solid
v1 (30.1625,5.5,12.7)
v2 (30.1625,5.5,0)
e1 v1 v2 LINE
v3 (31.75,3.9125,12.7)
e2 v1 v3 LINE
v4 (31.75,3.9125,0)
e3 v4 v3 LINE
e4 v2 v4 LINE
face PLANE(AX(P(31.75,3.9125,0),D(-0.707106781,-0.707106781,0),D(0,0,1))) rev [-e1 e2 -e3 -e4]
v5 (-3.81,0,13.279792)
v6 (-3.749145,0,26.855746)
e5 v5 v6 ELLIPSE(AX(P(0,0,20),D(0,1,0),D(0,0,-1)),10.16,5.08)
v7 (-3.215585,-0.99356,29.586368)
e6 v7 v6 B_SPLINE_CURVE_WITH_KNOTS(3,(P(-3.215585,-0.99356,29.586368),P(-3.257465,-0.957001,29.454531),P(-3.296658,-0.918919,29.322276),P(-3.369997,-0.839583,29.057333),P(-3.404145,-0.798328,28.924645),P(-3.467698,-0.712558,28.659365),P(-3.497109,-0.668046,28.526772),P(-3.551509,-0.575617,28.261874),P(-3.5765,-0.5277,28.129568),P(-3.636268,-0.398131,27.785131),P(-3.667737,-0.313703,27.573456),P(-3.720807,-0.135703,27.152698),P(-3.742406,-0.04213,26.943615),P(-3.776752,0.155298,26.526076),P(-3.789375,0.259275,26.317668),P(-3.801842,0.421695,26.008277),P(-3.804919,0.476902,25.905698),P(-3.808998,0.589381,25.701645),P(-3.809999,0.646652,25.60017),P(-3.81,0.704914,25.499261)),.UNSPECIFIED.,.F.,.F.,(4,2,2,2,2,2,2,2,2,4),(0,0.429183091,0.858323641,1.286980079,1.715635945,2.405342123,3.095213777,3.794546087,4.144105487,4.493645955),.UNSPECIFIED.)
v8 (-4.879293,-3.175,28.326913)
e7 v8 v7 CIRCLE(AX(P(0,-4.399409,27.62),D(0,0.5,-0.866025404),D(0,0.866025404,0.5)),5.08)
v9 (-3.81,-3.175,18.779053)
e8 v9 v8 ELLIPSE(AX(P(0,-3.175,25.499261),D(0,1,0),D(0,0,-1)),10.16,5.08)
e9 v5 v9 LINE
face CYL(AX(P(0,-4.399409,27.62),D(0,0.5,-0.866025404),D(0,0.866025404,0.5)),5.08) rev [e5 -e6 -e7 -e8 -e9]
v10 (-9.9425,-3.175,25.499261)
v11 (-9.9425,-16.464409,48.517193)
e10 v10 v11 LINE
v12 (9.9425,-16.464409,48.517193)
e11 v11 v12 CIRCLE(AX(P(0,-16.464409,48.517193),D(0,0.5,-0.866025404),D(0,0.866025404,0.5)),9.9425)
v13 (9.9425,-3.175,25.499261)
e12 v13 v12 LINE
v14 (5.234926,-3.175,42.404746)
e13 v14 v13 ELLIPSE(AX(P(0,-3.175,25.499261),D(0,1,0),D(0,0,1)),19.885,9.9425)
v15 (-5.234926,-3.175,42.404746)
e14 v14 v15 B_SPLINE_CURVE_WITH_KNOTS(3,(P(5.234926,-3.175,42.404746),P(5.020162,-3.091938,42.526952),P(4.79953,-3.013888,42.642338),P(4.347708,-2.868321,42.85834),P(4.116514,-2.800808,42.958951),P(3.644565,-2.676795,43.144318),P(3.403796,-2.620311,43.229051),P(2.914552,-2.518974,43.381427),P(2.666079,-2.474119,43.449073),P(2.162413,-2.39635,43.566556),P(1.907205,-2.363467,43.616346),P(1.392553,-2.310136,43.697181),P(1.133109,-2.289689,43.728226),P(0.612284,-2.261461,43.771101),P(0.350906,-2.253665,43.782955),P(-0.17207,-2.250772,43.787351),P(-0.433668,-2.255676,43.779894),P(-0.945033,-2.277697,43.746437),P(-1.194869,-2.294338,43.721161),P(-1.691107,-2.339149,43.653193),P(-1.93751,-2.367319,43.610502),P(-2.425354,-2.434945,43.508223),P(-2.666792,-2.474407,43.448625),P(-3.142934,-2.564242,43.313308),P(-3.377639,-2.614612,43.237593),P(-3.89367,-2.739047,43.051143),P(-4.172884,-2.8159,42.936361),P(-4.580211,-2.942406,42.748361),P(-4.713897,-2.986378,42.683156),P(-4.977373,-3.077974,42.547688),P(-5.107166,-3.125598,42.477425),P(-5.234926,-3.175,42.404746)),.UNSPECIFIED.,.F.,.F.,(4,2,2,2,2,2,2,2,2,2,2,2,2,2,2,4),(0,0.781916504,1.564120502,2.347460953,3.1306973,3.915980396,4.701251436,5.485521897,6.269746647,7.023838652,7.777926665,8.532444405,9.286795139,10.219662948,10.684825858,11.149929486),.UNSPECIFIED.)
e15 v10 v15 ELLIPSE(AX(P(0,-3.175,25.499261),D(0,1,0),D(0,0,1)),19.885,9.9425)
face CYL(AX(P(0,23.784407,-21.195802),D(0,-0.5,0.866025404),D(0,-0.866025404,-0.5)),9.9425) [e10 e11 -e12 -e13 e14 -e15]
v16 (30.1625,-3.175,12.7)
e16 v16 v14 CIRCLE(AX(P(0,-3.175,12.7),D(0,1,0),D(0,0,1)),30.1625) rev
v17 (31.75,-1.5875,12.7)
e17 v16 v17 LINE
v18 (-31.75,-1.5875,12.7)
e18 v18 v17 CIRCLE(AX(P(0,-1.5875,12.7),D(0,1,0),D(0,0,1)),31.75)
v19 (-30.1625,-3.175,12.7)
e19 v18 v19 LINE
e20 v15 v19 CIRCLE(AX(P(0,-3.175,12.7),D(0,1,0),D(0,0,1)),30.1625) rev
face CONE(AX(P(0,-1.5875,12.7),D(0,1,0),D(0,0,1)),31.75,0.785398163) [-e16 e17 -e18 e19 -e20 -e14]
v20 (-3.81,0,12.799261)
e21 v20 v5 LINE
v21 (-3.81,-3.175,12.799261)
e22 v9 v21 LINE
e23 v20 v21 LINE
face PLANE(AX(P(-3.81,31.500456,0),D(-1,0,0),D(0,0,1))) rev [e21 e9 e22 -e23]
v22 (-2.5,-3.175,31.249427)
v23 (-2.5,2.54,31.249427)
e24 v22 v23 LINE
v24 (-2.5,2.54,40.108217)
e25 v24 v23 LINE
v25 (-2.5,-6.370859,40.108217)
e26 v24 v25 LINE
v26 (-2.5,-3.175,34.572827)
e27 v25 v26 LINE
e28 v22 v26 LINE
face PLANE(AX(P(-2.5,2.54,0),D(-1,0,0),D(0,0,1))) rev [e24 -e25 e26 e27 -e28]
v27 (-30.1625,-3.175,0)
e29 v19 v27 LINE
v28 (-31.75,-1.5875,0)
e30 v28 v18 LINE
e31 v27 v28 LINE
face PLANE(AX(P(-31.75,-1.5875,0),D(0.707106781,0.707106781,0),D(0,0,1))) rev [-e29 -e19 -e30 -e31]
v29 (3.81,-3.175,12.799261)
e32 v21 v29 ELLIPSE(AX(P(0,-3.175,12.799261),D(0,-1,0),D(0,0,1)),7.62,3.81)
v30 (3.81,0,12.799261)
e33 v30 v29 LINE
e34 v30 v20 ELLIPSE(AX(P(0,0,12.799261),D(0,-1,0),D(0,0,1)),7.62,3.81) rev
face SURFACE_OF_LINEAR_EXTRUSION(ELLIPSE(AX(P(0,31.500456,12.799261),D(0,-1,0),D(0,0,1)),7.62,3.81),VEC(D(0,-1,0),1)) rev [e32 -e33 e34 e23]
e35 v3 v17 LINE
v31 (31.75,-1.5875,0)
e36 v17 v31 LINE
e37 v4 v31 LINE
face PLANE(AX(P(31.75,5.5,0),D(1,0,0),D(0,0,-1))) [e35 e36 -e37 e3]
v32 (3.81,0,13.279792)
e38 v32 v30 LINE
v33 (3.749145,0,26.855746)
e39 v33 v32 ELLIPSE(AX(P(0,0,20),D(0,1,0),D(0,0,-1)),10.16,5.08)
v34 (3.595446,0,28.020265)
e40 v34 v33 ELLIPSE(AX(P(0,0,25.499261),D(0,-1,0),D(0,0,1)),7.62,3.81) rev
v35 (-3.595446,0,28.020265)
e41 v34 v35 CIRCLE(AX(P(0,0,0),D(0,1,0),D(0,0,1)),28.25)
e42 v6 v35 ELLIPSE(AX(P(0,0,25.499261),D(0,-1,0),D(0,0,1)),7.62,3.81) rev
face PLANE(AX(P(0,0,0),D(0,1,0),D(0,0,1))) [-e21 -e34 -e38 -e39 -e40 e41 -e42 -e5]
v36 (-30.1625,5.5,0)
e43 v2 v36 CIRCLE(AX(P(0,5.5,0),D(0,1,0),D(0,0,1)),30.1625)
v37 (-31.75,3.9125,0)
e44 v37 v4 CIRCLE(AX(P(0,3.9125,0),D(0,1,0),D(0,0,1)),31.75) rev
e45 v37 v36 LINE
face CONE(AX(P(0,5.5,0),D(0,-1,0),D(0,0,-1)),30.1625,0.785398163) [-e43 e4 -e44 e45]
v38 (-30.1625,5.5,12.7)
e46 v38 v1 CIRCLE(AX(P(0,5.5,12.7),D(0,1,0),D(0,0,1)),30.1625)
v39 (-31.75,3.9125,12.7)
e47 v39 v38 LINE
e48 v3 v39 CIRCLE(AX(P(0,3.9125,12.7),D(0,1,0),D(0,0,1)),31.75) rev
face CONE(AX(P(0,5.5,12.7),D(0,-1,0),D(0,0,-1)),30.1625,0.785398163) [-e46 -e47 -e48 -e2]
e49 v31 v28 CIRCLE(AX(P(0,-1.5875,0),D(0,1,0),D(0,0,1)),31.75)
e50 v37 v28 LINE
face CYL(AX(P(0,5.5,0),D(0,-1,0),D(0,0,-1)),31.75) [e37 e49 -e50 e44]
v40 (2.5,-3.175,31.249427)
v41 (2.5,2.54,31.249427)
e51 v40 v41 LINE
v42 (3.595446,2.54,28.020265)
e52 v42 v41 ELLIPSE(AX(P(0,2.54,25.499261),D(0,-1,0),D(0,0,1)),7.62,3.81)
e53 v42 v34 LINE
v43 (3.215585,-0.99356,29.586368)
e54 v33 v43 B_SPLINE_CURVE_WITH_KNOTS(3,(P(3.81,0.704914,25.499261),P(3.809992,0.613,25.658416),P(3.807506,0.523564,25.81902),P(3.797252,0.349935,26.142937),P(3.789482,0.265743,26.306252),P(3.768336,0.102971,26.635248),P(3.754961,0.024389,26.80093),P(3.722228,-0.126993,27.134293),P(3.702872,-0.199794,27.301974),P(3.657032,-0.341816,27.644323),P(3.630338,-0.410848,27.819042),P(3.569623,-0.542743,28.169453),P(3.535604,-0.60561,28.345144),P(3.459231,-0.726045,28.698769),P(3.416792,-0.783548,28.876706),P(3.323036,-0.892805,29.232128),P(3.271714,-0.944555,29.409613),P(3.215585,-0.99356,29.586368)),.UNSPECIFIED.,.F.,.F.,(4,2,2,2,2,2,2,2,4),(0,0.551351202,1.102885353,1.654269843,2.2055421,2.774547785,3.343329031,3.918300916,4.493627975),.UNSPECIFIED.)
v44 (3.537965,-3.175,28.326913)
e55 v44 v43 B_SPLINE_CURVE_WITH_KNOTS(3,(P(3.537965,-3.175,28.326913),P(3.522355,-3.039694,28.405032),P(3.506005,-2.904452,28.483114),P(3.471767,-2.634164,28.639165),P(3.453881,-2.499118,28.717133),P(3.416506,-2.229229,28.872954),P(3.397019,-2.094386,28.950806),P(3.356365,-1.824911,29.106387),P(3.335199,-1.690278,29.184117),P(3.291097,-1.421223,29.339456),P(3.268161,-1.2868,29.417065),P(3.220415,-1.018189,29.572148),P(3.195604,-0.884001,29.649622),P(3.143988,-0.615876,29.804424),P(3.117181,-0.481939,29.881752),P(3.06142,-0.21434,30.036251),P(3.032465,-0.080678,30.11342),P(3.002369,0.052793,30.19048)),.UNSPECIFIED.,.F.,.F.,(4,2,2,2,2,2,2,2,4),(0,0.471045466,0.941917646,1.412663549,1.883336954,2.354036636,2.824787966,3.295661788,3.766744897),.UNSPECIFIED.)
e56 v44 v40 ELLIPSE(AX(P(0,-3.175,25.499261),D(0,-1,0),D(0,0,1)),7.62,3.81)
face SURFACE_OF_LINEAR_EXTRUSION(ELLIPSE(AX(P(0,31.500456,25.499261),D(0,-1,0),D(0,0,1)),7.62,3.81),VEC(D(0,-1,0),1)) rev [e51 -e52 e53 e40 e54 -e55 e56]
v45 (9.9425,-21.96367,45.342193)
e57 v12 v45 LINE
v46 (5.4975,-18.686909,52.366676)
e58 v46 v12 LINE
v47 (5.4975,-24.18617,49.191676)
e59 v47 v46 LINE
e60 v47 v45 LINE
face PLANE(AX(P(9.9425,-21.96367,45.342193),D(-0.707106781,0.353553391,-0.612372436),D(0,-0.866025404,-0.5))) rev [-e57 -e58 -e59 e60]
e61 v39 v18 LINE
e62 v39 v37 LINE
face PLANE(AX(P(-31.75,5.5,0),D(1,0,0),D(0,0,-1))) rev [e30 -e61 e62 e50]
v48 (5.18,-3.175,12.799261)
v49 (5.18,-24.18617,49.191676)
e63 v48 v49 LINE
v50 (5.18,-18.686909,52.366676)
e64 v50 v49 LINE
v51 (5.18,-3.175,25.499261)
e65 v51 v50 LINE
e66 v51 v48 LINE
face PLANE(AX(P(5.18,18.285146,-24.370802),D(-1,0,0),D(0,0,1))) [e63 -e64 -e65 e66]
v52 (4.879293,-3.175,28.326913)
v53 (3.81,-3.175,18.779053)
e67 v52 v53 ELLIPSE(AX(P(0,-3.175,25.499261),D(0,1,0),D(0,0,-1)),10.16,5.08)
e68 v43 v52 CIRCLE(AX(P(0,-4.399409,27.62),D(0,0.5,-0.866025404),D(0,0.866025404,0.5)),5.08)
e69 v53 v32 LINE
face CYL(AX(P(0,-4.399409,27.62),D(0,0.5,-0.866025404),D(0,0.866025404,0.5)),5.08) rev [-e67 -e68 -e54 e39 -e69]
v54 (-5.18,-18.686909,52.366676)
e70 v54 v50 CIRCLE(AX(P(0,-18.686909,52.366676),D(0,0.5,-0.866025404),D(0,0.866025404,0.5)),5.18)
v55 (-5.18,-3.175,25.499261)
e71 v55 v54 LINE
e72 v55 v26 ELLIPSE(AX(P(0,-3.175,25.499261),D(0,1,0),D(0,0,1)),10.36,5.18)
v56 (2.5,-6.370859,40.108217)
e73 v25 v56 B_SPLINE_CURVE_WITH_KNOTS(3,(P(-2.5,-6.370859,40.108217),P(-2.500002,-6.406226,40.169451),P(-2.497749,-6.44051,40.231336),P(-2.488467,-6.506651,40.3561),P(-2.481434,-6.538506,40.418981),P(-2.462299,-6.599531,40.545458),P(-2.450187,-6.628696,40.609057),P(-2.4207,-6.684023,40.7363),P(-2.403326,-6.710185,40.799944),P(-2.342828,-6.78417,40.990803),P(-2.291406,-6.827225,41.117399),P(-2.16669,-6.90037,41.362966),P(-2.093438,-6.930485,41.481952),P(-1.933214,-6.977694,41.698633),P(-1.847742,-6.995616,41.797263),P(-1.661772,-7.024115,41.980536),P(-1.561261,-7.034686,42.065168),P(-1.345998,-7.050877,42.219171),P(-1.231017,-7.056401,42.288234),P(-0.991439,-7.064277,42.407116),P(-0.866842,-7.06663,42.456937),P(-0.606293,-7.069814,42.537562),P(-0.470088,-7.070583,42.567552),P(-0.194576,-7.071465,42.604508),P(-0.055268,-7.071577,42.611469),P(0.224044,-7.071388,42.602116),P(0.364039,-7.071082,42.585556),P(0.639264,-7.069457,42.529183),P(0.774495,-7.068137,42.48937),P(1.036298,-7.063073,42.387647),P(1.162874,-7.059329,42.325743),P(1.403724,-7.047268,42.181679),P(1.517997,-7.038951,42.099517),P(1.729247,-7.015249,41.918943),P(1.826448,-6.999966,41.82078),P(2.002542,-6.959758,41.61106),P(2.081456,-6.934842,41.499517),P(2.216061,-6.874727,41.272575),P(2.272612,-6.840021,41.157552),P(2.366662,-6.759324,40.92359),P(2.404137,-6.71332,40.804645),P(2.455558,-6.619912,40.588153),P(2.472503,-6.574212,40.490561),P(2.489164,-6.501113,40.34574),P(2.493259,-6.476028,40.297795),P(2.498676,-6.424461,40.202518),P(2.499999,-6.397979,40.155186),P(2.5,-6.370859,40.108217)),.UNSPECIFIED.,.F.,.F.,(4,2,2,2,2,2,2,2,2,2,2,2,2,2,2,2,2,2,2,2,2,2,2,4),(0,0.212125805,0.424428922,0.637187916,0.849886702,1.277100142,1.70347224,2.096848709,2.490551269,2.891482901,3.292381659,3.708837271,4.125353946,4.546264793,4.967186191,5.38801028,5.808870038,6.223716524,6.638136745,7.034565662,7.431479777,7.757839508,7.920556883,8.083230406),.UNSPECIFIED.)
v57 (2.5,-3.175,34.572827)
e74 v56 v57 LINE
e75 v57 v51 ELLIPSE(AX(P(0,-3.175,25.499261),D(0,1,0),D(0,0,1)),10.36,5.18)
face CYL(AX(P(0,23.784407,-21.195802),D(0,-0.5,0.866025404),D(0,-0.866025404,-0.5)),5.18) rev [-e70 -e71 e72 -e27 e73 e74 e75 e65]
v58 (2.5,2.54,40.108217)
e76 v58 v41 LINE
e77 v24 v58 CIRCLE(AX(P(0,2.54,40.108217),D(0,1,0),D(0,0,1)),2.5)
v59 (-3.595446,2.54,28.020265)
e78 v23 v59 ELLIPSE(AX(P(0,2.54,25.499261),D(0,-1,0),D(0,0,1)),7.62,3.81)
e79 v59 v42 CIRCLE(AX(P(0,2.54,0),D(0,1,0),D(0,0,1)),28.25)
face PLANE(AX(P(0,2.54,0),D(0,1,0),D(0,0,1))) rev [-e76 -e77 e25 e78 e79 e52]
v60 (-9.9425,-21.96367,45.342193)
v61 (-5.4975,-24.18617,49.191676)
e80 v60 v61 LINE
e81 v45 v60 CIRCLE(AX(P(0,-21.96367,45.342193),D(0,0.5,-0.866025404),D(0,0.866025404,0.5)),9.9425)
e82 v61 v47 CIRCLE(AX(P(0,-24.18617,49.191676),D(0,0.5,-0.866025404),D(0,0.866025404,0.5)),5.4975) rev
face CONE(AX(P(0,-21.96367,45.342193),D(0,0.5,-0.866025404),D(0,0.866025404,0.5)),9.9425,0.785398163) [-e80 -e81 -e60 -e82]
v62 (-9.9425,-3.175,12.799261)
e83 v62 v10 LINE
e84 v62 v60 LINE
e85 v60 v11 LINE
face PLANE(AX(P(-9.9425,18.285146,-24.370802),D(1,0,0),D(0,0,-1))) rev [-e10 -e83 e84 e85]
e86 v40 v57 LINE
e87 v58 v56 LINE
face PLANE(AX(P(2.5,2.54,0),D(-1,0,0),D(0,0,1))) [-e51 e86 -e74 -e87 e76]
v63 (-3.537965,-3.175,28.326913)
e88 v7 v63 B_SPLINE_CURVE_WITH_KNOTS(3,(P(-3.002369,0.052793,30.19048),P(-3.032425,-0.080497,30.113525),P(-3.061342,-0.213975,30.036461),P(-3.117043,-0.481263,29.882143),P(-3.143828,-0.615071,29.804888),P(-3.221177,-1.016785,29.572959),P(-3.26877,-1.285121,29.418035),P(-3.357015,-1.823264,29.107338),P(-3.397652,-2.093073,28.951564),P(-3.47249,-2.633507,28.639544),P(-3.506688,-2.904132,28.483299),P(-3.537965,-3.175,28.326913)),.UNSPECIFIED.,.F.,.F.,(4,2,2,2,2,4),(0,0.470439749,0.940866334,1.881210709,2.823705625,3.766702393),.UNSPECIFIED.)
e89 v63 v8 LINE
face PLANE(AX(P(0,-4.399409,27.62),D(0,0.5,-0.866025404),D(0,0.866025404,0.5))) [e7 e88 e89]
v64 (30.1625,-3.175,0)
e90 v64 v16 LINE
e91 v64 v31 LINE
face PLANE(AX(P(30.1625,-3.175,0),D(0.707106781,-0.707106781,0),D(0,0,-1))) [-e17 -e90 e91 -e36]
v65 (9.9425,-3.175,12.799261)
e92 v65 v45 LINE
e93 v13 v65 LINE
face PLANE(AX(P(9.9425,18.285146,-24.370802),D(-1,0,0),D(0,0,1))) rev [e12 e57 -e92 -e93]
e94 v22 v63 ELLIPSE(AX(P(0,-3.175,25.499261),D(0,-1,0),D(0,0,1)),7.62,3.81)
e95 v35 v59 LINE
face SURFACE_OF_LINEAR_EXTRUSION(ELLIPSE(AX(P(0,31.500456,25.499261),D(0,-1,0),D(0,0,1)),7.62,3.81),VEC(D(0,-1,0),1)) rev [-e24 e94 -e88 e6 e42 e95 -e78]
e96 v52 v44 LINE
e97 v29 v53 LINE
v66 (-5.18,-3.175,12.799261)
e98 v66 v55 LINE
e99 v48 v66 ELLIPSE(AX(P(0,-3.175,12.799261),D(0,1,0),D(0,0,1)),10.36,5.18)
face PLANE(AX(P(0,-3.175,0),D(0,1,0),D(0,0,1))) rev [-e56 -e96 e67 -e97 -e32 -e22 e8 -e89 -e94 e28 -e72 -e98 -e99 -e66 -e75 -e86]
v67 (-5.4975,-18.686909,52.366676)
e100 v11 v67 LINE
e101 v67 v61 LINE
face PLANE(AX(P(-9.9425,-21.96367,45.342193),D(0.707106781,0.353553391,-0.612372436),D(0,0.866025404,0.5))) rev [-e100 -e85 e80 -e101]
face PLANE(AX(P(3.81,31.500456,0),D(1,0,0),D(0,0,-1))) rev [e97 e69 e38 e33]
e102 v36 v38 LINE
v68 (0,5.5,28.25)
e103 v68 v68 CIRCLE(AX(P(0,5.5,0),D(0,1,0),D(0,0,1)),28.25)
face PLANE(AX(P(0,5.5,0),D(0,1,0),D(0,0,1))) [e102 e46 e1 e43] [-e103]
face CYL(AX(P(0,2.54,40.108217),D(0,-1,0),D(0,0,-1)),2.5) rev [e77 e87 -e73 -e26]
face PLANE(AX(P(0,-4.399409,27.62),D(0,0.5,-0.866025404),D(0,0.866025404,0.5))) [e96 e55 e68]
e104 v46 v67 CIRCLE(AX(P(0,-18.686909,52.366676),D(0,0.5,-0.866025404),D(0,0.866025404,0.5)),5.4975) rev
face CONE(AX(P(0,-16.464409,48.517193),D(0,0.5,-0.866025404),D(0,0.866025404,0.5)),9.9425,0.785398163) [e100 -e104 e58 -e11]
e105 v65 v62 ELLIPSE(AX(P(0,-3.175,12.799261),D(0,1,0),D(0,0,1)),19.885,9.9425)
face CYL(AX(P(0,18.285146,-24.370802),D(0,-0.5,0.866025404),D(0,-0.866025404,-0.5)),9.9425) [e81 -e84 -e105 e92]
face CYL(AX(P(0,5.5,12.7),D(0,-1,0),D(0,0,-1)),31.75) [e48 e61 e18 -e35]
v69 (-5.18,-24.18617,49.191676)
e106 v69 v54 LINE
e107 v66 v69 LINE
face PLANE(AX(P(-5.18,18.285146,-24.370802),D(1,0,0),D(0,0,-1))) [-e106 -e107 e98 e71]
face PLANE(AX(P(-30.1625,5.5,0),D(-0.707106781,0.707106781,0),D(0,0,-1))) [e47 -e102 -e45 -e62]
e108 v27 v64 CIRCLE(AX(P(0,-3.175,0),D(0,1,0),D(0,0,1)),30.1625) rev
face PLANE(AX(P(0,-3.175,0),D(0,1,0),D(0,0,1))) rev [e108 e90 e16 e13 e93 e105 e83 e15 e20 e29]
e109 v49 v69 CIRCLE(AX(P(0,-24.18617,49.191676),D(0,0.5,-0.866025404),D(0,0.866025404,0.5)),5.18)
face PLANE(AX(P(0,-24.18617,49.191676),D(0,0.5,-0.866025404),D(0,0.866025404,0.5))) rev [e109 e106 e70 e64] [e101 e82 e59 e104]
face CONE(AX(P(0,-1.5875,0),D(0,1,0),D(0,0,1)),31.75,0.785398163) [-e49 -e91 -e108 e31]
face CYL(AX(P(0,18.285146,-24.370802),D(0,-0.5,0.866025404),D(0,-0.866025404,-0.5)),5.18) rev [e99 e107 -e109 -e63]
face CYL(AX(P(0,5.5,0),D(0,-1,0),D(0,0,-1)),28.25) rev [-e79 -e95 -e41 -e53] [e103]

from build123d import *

# Parameters (mm, degrees)
BOSS_EXTRUDE1_DEPTH     = 5.5
BOSS_EXTRUDE2_START     = -3.175
BOSS_EXTRUDE2_DEPTH     = 3.175
BOSS_EXTRUDE4_REACH     = 95.106
CUT_EXTRUDE1_DEPTH      = 2.54
CUT_EXTRUDE1_DEPTH_BACK = 12.7
CUT_EXTRUDE2_REACH      = 73.925
SKETCH7_R               = 5.08
CUT_EXTRUDE4_DEPTH      = 19.05
CHAMFER3_SIZE           = 4.445
CHAMFER4_SIZE           = 1.5875


with BuildPart() as part:
    # Sketch1 → Boss-Extrude1 (new body)
    # profile 1 of 2: a face of its own
    with BuildSketch(Plane(origin=(0, 0, 0), x_dir=(1, 0, 0), z_dir=(0, 1, 0))):
        with BuildLine():
            Line((31.75, -12.7), (31.75, 0))
            ThreePointArc((31.75, 0), (0, 31.75), (-31.75, 0))
            Line((-31.75, 0), (-31.75, -12.7))
            ThreePointArc((-31.75, -12.7), (0, -44.45), (31.75, -12.7))
        make_face()
        with BuildLine():
            ThreePointArc((2.5, -40.108217228), (0, -42.608217228), (-2.5, -40.108217228))
            Line((-2.5, -40.108217228), (-2.5, -28.139163101))
            ThreePointArc((-2.5, -28.139163101), (-19.071411851, 20.840915287), (28.25, 0))
            ThreePointArc((28.25, 0), (20.840915287, -19.071411851), (2.5, -28.139163101))
            Line((2.5, -28.139163101), (2.5, -40.108217228))
        make_face(mode=Mode.SUBTRACT)
    # profile 2 of 2: a face of its own
    with BuildSketch(Plane(origin=(0, 0, 0), x_dir=(1, 0, 0), z_dir=(0, 1, 0))):
        with BuildLine():
            Line((-2.5, -28.139163101), (-2.5, -40.108217228))
            ThreePointArc((-2.5, -40.108217228), (0, -42.608217228), (2.5, -40.108217228))
            Line((2.5, -40.108217228), (2.5, -28.139163101))
            ThreePointArc((2.5, -28.139163101), (0, -28.25), (-2.5, -28.139163101))
        make_face()
    extrude(amount=BOSS_EXTRUDE1_DEPTH)

    # Sketch1<3> → Boss-Extrude2 (add)
    with BuildSketch(Plane(origin=(0, 0, 0), x_dir=(1, 0, 0), z_dir=(0, 1, 0)).offset(BOSS_EXTRUDE2_START)):
        with BuildLine():
            Line((31.75, 0), (31.75, -12.7))
            ThreePointArc((31.75, -12.7), (0, -44.45), (-31.75, -12.7))
            Line((-31.75, -12.7), (-31.75, 0))
            ThreePointArc((-31.75, 0), (0, 31.75), (31.75, 0))
        make_face()
    extrude(amount=BOSS_EXTRUDE2_DEPTH)

    # Sketch9 → Boss-Extrude4 (add, up to next)
    with BuildSketch(Plane(origin=(0, -18.686909051, 52.366675913), x_dir=(1, 0, 0), z_dir=(-1.7076979057767106e-15, 0.4999999999999981, -0.8660254037844397)), mode=Mode.PRIVATE) as boss_extrude4_sk1:
        with BuildLine():
            Line((9.9425, 6.35), (9.9425, 0))
            ThreePointArc((9.9425, 0), (0, -9.9425), (-9.9425, 0))
            Line((-9.9425, 0), (-9.9425, 6.35))
            ThreePointArc((-9.9425, 6.35), (0, 16.2925), (9.9425, 6.35))
        make_face()
        with BuildLine():
            Line((5.18, 6.35), (5.18, 0))
            ThreePointArc((5.18, 0), (0, -5.18), (-5.18, 0))
            Line((-5.18, 0), (-5.18, 6.35))
            ThreePointArc((-5.18, 6.35), (0, 11.53), (5.18, 6.35))
        make_face(mode=Mode.SUBTRACT)
    boss_extrude4_tool1 = extrude(boss_extrude4_sk1.sketch, amount=BOSS_EXTRUDE4_REACH, mode=Mode.PRIVATE) - part.part
    add(boss_extrude4_tool1.solids().sort_by_distance((-9.613306, -21.43654, 50.779176))[0])

    # Sketch1<5> → Cut-Extrude1 (cut, two sides: drawn at the far end of the back side and taken through both)
    with BuildSketch(Plane(origin=(0, 0, 0), x_dir=(1, 0, 0), z_dir=(0, 1, 0)).offset(-CUT_EXTRUDE1_DEPTH_BACK)):
        with BuildLine():
            Line((-2.5, -28.139163101), (-2.5, -40.108217228))
            ThreePointArc((-2.5, -40.108217228), (0, -42.608217228), (2.5, -40.108217228))
            Line((2.5, -40.108217228), (2.5, -28.139163101))
            ThreePointArc((2.5, -28.139163101), (0, -28.25), (-2.5, -28.139163101))
        make_face()
    extrude(amount=CUT_EXTRUDE1_DEPTH + CUT_EXTRUDE1_DEPTH_BACK, mode=Mode.SUBTRACT)

    # Cut-Extrude2: up to this face of the body (flat: up to its plane)
    cut_extrude2_end = Plane(part.part.faces().sort_by_distance((0, 2.54, 35.153591808))[0])
    # Sketch6 → Cut-Extrude2 (cut, up to the picked face)
    with BuildSketch(Plane.XZ.offset(3.175), mode=Mode.PRIVATE) as cut_extrude2_sk1:
        with BuildLine():
            Line((3.81, 12.799261314), (3.81, 25.499261314))
            add(Edge.make_bspline(
                [(3.81, 25.499261314), (3.81, 33.119261314), (0, 33.119261314), (-3.81, 33.119261314), (-3.81, 25.499261314)],
                knots=[4.71238898, 4.71238898, 4.71238898, 6.283185307, 6.283185307, 7.853981634, 7.853981634, 7.853981634], degree=2, weights=[1, 0.707106781, 1, 0.707106781, 1]))
            Line((-3.81, 25.499261314), (-3.81, 12.799261314))
            add(Edge.make_bspline(
                [(-3.81, 12.799261314), (-3.81, 5.179261314), (0, 5.179261314), (3.81, 5.179261314), (3.81, 12.799261314)],
                knots=[1.570796327, 1.570796327, 1.570796327, 3.141592654, 3.141592654, 4.71238898, 4.71238898, 4.71238898], degree=2, weights=[1, 0.707106781, 1, 0.707106781, 1]))
        make_face()
    cut_extrude2_tool1 = split(extrude(cut_extrude2_sk1.sketch, amount=-CUT_EXTRUDE2_REACH, mode=Mode.PRIVATE), bisect_by=cut_extrude2_end, keep=Keep.BOTH, mode=Mode.PRIVATE)
    add(cut_extrude2_tool1.solids().sort_by(Axis((0, -3.175, 19.149261), (0, 1, 0)))[0], mode=Mode.SUBTRACT)

    # Sketch7 → Cut-Extrude4 (cut)
    with BuildSketch(Plane(origin=(0, -3.534663089, 6.122216058), x_dir=(-1, 0, 0), z_dir=(-1.5543122344752196e-15, 0.49999999999999956, -0.8660254037844389))):
        with Locations((0, 10)):
            Circle(SKETCH7_R)
    extrude(amount=-CUT_EXTRUDE4_DEPTH, mode=Mode.SUBTRACT)

    # Chamfer3
    chamfer3_edges = [part.edges().sort_by_distance(p)[0] for p in [
        (-9.9425, -21.436539708, 50.779175913),
        (0, -32.796627942, 44.220425913),
        (0, -10.076451474, 57.337925913),
        (9.9425, -21.436539708, 50.779175913),
    ]]
    chamfer(chamfer3_edges, length=CHAMFER3_SIZE)

    # Chamfer4
    # the kernel refuses this chamfer: 1.5875 mm, written as the material it takes off along each edge
    with BuildSketch(Plane(origin=(0, -3.175, 12.7), x_dir=(0.025619349712622985, 0, 0.9996717705928794), z_dir=(0.9996717705928794, 0, -0.025619349712622985))) as chamfer4_piece_1_section:
        Polygon((31.75 - CHAMFER4_SIZE, 0), (31.75, -CHAMFER4_SIZE), (31.75, 0), align=None)
    chamfer4_piece_1 = revolve(axis=Axis((0, -3.175, 12.7), (0, -1, 0)), revolution_arc=91.468041234, mode=Mode.PRIVATE)
    chamfer4_piece_1 = chamfer4_piece_1 - Plane(origin=(0, -7.049278044, 32.20970773), x_dir=(1, 0, 0), z_dir=(1.7076979057767106e-15, -0.4999999999999981, 0.8660254037844397)) * Cylinder(9.9425, 127, mode=Mode.PRIVATE)
    add(chamfer4_piece_1, mode=Mode.SUBTRACT)
    with BuildSketch(Plane(origin=(31.75, -3.175, 0), x_dir=(-0.9996219169112966, -0.02749587661058651, 0), z_dir=(0, 0, 1)), Plane(origin=(-31.75, -3.175, 12.7), x_dir=(0.9996219169112966, -0.02749587661058651, 0), z_dir=(0, 0, -1))) as chamfer4_piece_2:
        Polygon((CHAMFER4_SIZE * 0.999621916911, -CHAMFER4_SIZE * 0.0274958766106), (-CHAMFER4_SIZE * 0.0274958766106, -CHAMFER4_SIZE * 0.999621916911), (0, 0), align=None)
    extrude(amount=12.7, mode=Mode.SUBTRACT)
    with BuildSketch(Plane(origin=(0, -3.175, 0), x_dir=(-1, 0, 0), z_dir=(0, 0, 1))) as chamfer4_piece_3:
        Polygon((31.75 - CHAMFER4_SIZE, 0), (31.75, -CHAMFER4_SIZE), (31.75, 0), align=None)
    revolve(axis=Axis((0, -3.175, 0), (0, -1, 0)), revolution_arc=180, mode=Mode.SUBTRACT)
    with BuildSketch(Plane(origin=(0, 5.5, 0), x_dir=(1, 0, 0), z_dir=(0, 0, 1))) as chamfer4_piece_4:
        Polygon((31.75, -CHAMFER4_SIZE), (31.75 - CHAMFER4_SIZE, 0), (31.75, 0), align=None)
    revolve(axis=Axis((0, 5.5, 0), (0, 1, 0)), revolution_arc=180, mode=Mode.SUBTRACT)
    with BuildSketch(Plane(origin=(-31.75, 5.5, 0), x_dir=(-0.027495876610585654, -0.9996219169112968, 0), z_dir=(0, 0, 1)), Plane(origin=(31.75, 5.5, 12.7), x_dir=(0.027495876610585654, -0.9996219169112968, 0), z_dir=(0, 0, -1))) as chamfer4_piece_5:
        Polygon((CHAMFER4_SIZE * 0.999621916911, CHAMFER4_SIZE * 0.0274958766106), (-CHAMFER4_SIZE * 0.0274958766106, CHAMFER4_SIZE * 0.999621916911), (0, 0), align=None)
    extrude(amount=12.7, mode=Mode.SUBTRACT)
    with BuildSketch(Plane(origin=(0, 5.5, 12.7), x_dir=(-1, 0, 0), z_dir=(0, 0, -1))) as chamfer4_piece_6:
        Polygon((31.75, -CHAMFER4_SIZE), (31.75 - CHAMFER4_SIZE, 0), (31.75, 0), align=None)
    revolve(axis=Axis((0, 5.5, 12.7), (0, 1, 0)), revolution_arc=180, mode=Mode.SUBTRACT)
    with BuildSketch(Plane(origin=(0, -3.175, 12.7), x_dir=(1, 0, 0), z_dir=(0, 0, -1))) as chamfer4_piece_7_section:
        Polygon((31.75 - CHAMFER4_SIZE, 0), (31.75, -CHAMFER4_SIZE), (31.75, 0), align=None)
    chamfer4_piece_7 = revolve(axis=Axis((0, -3.175, 12.7), (0, -1, 0)), revolution_arc=91.468041234, mode=Mode.PRIVATE)
    chamfer4_piece_7 = chamfer4_piece_7 - Plane(origin=(0, -7.049278047, 32.209707734), x_dir=(1, 0, 0), z_dir=(1.7076979057767106e-15, -0.4999999999999981, 0.8660254037844397)) * Cylinder(9.9425, 127, mode=Mode.PRIVATE)
    add(chamfer4_piece_7, mode=Mode.SUBTRACT)


solid = part.part
